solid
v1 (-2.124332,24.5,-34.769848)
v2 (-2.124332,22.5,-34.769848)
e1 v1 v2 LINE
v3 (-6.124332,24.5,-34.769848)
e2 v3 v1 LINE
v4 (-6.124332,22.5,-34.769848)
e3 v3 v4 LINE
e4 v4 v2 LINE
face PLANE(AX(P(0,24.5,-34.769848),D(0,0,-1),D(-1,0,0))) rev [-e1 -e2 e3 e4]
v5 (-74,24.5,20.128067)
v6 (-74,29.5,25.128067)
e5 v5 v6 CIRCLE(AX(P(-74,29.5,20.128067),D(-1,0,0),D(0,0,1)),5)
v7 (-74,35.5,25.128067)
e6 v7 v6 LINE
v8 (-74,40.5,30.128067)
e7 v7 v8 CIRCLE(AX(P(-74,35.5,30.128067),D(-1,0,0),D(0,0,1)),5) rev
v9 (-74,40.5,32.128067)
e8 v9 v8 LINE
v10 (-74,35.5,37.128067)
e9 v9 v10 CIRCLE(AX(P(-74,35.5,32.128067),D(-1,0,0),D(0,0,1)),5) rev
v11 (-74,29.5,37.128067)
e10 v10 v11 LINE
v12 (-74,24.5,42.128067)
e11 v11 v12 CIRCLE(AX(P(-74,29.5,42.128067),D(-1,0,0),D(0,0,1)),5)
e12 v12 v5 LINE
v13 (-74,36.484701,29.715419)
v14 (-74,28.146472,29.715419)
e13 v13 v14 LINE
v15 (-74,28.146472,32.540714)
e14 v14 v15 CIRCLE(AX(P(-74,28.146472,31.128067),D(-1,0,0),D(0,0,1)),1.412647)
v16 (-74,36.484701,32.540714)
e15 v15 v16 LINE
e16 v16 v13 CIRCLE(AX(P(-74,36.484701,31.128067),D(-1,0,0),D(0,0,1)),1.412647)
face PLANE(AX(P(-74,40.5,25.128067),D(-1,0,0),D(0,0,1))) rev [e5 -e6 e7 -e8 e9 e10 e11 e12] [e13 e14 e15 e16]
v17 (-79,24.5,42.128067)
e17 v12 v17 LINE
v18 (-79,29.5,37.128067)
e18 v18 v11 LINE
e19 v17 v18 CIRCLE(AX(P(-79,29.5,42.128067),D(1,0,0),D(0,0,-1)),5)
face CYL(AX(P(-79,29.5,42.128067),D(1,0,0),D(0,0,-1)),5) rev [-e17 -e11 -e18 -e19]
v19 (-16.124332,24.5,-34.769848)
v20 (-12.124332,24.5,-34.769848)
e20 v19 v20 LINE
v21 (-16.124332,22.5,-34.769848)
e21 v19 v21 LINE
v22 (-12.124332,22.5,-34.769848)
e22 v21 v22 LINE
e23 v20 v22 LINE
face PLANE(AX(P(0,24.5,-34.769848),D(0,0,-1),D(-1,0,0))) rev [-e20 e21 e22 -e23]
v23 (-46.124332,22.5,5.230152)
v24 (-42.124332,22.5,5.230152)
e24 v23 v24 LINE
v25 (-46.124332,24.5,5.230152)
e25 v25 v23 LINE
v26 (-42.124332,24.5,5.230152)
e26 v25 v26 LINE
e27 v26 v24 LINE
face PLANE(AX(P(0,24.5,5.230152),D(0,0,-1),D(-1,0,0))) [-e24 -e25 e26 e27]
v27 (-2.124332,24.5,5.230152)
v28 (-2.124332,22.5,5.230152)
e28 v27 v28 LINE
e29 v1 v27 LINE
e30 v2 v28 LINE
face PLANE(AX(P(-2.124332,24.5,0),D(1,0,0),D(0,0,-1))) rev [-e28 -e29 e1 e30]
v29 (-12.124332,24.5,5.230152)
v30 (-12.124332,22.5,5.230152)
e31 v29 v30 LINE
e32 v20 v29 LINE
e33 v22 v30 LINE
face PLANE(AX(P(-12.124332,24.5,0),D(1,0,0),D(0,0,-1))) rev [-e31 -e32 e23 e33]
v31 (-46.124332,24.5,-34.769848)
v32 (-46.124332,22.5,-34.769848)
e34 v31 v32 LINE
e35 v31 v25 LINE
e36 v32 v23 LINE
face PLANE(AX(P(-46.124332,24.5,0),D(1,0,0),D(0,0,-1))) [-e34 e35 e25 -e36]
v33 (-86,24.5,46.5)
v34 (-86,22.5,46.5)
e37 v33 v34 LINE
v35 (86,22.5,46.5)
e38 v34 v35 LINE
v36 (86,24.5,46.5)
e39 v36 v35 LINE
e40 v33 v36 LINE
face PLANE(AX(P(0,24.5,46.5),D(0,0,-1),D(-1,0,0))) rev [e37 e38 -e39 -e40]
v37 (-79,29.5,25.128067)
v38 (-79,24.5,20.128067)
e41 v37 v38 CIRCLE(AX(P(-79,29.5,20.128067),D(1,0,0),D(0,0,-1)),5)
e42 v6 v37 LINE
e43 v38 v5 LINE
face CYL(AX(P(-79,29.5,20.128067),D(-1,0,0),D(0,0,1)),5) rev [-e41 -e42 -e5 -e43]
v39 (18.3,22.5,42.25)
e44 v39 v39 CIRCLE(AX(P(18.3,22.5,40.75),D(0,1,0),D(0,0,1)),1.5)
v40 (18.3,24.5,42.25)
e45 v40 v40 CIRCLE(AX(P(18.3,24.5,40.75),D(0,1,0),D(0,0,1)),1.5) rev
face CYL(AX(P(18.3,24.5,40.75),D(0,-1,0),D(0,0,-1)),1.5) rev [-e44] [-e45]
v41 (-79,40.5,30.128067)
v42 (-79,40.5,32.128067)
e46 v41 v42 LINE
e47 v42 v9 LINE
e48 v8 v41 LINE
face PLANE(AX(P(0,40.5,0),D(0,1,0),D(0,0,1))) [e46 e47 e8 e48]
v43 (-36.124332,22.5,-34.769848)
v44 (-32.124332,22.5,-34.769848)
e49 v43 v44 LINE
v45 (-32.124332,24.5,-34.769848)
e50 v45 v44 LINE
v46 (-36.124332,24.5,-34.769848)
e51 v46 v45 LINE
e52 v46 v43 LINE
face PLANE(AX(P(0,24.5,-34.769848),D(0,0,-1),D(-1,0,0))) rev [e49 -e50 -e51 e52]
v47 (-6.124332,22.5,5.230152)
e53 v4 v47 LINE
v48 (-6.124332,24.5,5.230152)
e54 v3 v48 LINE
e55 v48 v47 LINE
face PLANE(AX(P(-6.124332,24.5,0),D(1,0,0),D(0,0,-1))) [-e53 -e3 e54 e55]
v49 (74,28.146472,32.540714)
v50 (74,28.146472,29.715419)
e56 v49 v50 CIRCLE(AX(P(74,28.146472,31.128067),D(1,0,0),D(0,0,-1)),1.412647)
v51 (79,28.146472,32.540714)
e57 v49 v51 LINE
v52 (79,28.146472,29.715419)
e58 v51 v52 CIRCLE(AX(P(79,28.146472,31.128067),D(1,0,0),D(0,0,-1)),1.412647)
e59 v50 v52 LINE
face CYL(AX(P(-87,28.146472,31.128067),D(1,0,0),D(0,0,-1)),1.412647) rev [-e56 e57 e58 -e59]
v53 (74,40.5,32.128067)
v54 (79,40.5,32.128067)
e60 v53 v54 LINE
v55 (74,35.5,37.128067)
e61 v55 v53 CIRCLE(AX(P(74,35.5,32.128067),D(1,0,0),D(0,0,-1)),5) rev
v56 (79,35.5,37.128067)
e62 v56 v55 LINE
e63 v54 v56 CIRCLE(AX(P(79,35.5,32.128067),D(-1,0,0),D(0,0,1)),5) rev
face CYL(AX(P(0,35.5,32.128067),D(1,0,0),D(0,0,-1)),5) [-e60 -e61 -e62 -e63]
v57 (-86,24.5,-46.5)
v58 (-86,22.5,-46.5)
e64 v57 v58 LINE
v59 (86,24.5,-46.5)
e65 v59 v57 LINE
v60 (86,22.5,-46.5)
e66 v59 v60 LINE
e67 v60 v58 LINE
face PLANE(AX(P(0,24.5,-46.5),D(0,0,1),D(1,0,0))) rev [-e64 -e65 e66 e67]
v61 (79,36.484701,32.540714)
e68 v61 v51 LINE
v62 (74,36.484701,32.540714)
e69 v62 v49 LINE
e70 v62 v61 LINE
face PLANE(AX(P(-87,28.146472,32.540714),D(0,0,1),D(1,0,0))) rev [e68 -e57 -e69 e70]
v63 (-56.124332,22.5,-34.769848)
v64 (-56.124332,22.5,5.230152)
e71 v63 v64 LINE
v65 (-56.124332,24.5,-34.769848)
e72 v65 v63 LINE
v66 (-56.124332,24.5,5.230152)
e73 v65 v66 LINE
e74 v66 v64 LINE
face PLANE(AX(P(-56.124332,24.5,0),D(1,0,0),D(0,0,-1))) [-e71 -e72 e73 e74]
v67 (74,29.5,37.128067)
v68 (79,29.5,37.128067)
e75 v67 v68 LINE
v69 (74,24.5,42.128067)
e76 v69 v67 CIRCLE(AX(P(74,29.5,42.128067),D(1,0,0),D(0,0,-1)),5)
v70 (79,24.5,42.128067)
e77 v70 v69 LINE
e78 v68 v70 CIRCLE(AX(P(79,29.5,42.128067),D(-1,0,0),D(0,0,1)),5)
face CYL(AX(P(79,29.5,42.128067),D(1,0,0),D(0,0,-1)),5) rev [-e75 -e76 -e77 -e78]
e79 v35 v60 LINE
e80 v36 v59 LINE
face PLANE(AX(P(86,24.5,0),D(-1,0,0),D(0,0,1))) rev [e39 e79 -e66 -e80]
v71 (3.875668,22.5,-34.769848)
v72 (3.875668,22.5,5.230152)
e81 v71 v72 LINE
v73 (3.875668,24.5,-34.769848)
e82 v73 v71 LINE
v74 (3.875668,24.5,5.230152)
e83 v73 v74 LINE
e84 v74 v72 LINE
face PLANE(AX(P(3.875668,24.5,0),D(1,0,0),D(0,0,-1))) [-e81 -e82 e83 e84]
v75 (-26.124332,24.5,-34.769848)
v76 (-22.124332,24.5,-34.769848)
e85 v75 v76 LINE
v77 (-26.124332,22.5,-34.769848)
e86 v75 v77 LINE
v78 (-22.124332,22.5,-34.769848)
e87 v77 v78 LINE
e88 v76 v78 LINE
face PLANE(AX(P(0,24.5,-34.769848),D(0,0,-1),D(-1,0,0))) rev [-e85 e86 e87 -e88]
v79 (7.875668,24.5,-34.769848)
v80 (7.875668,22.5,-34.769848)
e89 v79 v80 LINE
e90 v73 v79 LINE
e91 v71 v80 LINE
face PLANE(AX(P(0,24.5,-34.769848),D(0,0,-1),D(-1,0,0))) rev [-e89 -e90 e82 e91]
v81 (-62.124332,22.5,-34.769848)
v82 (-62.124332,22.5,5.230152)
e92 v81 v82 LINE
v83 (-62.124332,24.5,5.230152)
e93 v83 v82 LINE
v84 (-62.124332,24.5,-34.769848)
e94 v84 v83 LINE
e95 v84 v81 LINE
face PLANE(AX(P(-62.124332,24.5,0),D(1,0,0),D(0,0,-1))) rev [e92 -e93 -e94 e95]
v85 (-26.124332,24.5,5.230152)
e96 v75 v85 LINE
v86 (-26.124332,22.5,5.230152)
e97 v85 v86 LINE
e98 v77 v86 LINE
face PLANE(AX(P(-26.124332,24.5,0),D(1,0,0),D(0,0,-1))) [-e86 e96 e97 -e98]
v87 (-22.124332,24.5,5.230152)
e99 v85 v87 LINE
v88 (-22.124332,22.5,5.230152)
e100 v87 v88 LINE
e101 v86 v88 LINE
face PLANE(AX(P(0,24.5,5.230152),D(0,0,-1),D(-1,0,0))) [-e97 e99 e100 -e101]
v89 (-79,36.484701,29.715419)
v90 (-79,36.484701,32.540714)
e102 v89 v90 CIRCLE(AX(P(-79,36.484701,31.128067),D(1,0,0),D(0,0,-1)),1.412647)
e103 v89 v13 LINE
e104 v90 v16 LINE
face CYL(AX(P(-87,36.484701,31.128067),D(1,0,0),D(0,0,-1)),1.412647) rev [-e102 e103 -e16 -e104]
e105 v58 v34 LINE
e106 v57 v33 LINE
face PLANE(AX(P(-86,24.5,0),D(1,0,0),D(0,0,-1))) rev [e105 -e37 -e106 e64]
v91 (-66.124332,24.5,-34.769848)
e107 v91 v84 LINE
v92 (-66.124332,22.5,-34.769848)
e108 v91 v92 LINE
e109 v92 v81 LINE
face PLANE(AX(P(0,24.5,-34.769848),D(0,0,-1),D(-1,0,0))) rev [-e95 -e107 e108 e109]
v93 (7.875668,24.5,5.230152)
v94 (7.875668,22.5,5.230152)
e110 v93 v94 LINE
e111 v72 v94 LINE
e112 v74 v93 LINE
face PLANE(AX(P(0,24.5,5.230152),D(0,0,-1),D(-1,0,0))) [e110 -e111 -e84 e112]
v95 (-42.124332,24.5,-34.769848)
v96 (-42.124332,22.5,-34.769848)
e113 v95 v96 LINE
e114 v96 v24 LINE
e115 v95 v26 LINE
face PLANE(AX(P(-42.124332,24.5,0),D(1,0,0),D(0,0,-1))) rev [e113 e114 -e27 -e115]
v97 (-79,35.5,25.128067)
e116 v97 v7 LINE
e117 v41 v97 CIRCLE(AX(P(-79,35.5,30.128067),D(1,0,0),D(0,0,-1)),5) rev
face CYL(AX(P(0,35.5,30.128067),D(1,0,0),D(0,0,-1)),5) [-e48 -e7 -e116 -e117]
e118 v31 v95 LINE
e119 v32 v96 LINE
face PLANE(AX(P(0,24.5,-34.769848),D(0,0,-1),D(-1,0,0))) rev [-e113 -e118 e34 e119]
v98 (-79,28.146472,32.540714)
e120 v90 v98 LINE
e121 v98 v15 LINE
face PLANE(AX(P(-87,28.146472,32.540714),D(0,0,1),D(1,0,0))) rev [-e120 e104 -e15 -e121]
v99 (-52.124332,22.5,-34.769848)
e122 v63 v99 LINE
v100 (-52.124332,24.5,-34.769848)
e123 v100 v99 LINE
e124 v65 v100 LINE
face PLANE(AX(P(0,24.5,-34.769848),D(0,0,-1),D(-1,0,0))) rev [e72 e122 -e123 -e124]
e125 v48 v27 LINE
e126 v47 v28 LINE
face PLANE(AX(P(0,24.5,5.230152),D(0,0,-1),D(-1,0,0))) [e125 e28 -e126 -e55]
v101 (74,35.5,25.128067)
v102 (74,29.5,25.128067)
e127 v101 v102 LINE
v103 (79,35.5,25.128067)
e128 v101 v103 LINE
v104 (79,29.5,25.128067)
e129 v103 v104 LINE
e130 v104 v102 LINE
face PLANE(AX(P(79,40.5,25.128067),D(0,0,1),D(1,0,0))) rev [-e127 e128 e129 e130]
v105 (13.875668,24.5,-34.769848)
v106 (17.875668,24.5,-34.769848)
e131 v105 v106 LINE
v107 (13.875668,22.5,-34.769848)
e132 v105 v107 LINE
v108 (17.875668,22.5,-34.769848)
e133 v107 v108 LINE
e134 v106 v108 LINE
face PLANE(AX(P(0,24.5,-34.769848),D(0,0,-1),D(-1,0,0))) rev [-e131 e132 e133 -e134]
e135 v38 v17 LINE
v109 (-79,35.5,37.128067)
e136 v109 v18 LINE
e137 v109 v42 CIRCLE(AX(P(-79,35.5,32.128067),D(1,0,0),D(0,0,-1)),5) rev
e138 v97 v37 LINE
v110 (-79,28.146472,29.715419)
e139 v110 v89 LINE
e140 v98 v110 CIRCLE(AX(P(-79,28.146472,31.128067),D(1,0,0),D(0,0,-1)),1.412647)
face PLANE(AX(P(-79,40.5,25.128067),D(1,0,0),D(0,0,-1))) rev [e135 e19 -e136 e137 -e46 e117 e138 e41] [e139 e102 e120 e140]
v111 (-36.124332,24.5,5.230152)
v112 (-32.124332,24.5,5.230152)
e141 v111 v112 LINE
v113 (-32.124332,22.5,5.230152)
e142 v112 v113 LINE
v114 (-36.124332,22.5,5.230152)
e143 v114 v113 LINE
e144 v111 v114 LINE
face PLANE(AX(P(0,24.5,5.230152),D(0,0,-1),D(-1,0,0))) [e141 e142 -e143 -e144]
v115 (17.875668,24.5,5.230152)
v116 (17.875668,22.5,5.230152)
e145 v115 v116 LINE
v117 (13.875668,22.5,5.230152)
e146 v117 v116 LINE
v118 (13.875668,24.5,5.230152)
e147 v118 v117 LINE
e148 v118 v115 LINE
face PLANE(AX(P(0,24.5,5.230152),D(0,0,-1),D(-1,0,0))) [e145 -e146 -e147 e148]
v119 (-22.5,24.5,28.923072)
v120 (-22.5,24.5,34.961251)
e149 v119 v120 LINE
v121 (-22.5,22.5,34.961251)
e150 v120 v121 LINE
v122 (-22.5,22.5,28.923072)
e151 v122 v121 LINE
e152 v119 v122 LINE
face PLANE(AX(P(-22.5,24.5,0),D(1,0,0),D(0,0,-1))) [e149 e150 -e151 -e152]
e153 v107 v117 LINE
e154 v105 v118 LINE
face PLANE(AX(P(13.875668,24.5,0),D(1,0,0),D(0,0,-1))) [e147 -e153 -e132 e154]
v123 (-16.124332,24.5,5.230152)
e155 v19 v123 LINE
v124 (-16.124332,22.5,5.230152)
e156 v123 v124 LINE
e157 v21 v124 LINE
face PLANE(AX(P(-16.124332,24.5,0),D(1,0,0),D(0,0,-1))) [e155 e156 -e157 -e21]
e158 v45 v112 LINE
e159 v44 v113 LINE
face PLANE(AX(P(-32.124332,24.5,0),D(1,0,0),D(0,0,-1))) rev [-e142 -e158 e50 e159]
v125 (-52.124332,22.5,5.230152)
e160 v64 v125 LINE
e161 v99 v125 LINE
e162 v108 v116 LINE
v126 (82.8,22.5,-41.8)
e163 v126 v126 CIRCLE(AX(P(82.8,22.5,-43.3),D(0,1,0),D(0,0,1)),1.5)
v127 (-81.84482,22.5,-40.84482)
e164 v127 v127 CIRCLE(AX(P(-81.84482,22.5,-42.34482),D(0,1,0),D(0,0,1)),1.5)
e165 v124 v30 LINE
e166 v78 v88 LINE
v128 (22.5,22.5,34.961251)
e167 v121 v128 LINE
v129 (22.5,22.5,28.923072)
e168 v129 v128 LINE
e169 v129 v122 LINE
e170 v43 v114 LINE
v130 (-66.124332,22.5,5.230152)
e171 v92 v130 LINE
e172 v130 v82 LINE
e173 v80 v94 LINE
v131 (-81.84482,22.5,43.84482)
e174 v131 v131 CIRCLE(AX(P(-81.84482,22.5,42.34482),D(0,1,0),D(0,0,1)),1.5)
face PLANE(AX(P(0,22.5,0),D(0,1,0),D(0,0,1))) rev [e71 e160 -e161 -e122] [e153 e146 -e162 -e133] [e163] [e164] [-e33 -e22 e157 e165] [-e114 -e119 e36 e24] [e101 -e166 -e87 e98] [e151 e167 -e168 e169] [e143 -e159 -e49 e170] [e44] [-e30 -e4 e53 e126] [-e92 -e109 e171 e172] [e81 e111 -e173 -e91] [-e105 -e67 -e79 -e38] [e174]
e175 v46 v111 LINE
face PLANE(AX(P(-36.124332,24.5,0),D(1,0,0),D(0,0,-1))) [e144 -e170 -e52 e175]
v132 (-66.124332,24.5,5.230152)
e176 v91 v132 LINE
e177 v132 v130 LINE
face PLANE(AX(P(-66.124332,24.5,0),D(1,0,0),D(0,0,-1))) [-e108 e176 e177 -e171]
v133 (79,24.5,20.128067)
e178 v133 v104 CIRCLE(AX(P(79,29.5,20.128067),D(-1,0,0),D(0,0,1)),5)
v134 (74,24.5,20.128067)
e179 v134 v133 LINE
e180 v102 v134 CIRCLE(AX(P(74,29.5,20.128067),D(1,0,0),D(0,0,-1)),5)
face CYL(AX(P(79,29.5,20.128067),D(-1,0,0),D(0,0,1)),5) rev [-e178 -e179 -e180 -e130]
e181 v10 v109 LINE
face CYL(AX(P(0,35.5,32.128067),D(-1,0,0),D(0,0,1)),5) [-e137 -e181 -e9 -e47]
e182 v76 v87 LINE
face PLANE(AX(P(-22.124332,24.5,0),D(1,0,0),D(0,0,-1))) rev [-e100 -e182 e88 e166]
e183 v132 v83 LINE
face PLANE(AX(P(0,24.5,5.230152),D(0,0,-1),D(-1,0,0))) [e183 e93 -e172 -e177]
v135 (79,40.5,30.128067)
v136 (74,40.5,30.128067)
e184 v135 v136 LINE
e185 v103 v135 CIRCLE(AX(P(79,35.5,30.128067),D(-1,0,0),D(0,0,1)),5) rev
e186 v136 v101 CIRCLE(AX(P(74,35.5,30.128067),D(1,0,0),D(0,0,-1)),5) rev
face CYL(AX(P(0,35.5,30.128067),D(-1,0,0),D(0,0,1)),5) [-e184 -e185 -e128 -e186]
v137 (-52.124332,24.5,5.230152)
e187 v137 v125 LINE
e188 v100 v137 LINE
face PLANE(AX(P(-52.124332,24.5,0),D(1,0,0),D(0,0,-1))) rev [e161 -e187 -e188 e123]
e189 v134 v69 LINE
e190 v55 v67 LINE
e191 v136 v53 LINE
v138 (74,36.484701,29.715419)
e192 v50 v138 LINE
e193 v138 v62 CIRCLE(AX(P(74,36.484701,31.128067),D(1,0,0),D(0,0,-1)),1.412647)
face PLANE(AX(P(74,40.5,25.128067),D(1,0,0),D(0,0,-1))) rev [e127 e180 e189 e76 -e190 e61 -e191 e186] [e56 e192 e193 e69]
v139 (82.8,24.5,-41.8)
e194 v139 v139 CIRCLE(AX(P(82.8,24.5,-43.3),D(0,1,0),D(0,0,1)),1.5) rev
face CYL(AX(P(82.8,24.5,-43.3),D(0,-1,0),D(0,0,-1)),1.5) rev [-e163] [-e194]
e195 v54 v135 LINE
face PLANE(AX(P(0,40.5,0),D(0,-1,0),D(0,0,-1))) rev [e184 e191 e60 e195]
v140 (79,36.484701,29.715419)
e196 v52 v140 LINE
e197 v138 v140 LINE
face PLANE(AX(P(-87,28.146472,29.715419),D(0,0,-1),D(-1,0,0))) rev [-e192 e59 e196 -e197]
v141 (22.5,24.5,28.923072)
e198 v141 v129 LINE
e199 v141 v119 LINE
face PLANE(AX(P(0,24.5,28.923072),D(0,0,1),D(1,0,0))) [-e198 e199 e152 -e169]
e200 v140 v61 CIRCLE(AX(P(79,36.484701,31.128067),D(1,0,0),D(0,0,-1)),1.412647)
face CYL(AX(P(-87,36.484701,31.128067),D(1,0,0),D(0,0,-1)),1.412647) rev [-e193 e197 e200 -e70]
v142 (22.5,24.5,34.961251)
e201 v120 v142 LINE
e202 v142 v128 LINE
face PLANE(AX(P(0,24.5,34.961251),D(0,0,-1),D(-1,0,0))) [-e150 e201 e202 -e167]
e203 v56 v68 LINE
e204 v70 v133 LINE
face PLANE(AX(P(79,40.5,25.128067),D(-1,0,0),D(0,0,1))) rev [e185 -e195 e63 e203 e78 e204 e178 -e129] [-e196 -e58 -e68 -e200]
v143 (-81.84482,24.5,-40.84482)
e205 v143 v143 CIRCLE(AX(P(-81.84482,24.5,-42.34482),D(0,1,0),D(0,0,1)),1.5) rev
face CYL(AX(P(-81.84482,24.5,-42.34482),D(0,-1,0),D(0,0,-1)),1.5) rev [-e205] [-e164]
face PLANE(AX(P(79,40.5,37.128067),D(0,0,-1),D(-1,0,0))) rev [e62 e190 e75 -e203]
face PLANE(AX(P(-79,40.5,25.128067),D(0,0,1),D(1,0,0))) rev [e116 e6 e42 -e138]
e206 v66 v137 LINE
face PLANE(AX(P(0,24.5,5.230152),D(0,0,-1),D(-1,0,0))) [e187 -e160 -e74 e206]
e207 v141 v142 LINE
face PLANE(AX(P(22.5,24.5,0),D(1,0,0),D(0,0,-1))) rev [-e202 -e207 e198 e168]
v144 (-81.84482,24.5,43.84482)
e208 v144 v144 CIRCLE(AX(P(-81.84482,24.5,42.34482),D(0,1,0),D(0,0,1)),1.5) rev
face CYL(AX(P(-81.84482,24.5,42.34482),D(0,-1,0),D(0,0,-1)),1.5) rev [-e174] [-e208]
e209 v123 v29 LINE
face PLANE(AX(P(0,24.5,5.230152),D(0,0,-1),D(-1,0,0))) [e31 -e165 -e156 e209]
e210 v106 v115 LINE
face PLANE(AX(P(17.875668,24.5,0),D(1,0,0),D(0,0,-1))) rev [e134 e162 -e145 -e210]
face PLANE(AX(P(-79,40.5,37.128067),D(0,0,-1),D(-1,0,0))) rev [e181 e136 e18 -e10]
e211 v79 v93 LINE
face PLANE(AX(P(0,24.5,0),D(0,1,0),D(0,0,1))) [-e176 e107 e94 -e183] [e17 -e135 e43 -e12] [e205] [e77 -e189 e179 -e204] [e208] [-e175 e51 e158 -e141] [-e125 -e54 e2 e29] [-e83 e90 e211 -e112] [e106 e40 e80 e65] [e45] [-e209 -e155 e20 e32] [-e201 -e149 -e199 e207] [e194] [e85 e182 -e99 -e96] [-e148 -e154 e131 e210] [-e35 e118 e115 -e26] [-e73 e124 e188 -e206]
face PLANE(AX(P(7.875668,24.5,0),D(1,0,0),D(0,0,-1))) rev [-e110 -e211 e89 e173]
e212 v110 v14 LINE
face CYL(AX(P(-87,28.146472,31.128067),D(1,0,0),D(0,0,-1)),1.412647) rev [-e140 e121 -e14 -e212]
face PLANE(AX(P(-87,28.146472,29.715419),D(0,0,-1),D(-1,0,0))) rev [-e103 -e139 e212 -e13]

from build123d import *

# Parameters (mm, degrees)
SKETCH1_W            = 172
SKETCH1_H            = 93
BOSS_EXTRUDE1_DEPTH  = 1
SKETCH2_W            = 172
SKETCH2_H            = 93
SKETCH2_W_2          = 169
SKETCH2_H_2          = 90
BOSS_EXTRUDE2_DEPTH  = 21.5
SKETCH3_W            = 14.5
SKETCH3_H            = 20
SKETCH3_W_2          = 16.2
SKETCH3_W_3          = 76
SKETCH3_H_2          = 7
CUT_EXTRUDE1_DEPTH   = 21.5
BOSS_EXTRUDE3_DEPTH  = 10
FILLET1_R            = 4
SKETCH5_R            = 1.5
BOSS_EXTRUDE4_DEPTH  = 2.5
BOSS_EXTRUDE5_DEPTH  = 10
SKETCH7_W            = 1.5
SKETCH7_H            = 3.5
BOSS_EXTRUDE6_DEPTH  = 10
FILLET2_R            = 4
SKETCH8_R            = 4
SKETCH8_R_2          = 1.5
BOSS_EXTRUDE7_DEPTH  = 14
SKETCH10_W           = 16
SKETCH10_H           = 4
CUT_EXTRUDE2_DEPTH   = 14
CUT_EXTRUDE3_DEPTH   = 1.6
FILLET3_R            = 4
SKETCH12_W           = 10
SKETCH12_H           = 6
SKETCH12_W_2         = 8
SKETCH12_H_2         = 8
CUT_EXTRUDE4_DEPTH   = 25.1
SKETCH13_W           = 6.4
SKETCH13_H           = 6.4
SKETCH13_W_2         = 6
SKETCH13_H_2         = 6
BOSS_EXTRUDE8_DEPTH  = 21.5
FILLET4_R            = 3
SKETCH14_R           = 1.5
CUT_EXTRUDE5_DEPTH   = 20
SKETCH15_W           = 172
SKETCH15_H           = 93
SKETCH15_R           = 1.5
SKETCH15_W_2         = 4
SKETCH15_H_2         = 40
SKETCH15_W_3         = 45
SKETCH15_H_3         = 6.0381788
BOSS_EXTRUDE9_DEPTH  = 2
SKETCH16_W           = 56
SKETCH16_H           = 7.274551358
CUT_EXTRUDE6_DEPTH   = 2
SKETCH17_W           = 5
SKETCH17_H           = 12
BOSS_EXTRUDE10_DEPTH = 16
FILLET6_R            = 5
CUT_EXTRUDE7_DEPTH   = 166


# Read off the part's stored shape, not the designer's step: Intersect2
# Some blends are built 0.0001 mm under size
with BuildPart() as part:
    # Sketch1 → Boss-Extrude1 (new body)
    with BuildSketch(Plane(origin=(0, 0, 0), x_dir=(1, 0, 0), z_dir=(0, 1, 0))):
        Rectangle(SKETCH1_W, SKETCH1_H)
    extrude(amount=BOSS_EXTRUDE1_DEPTH)

    # Sketch2 → Boss-Extrude2 (add)
    with BuildSketch(Plane(origin=(0, 1, 0), x_dir=(1, 0, 0), z_dir=(0, 1, 0))):
        Rectangle(SKETCH2_W, SKETCH2_H)
        Rectangle(SKETCH2_W_2, SKETCH2_H_2, mode=Mode.SUBTRACT)
    extrude(amount=BOSS_EXTRUDE2_DEPTH)

    # Sketch3 → Cut-Extrude1 (cut)
    with BuildSketch(Plane.XY.offset(46.5)):
        with Locations((74.75, 11)):
            Rectangle(SKETCH3_W, SKETCH3_H)
        with Locations((57.75, 11)):
            Rectangle(SKETCH3_W, SKETCH3_H)
        with Locations((39, 11)):
            Rectangle(SKETCH3_W_2, SKETCH3_H)
        with Locations((-30.2, 6.2)):
            Rectangle(SKETCH3_W_3, SKETCH3_H_2)
    extrude(amount=-CUT_EXTRUDE1_DEPTH, mode=Mode.SUBTRACT)

    # Sketch4 → Boss-Extrude3 (add)
    with BuildSketch(Plane(origin=(0, 1, 0), x_dir=(1, 0, 0), z_dir=(0, 1, 0))):
        Polygon((26.9, -45), (28.4, -45), (28.4, 40.1), (84.5, 40.1), (84.5, 41.6), (26.9, 41.6), align=None)
    extrude(amount=BOSS_EXTRUDE3_DEPTH)

    # Fillet1
    fillet1_edges = [part.edges().sort_by_distance(p)[0] for p in [
        (26.9, 6, 45),
    ]]
    fillet(fillet1_edges, radius=FILLET1_R)

    # Sketch5 → Boss-Extrude4 (add)
    # profile 1 of 4: a face of its own
    with BuildSketch(Plane(origin=(0, 1, 0), x_dir=(1, 0, 0), z_dir=(0, 1, 0))):
        with BuildLine():
            Line((28.4, 40.1), (35.4, 40.1))
            Line((35.4, 40.1), (35.4, 35.1))
            ThreePointArc((35.4, 35.1), (34.814213562, 33.685786438), (33.4, 33.1))
            Line((33.4, 33.1), (28.4, 33.1))
            Line((28.4, 33.1), (28.4, 40.1))
        make_face()
        with Locations(Location((32.6, 36.1, 0), (0, 0, 270))):
            Circle(SKETCH5_R, mode=Mode.SUBTRACT)
    # profile 2 of 4: a face of its own
    with BuildSketch(Plane(origin=(0, 1, 0), x_dir=(1, 0, 0), z_dir=(0, 1, 0))):
        with BuildLine():
            Line((84.5, 40.1), (77.5, 40.1))
            Line((77.5, 40.1), (77.5, 35.1))
            ThreePointArc((77.5, 35.1), (78.085786438, 33.685786438), (79.5, 33.1))
            Line((79.5, 33.1), (84.5, 33.1))
            Line((84.5, 33.1), (84.5, 40.1))
        make_face()
        with Locations(Location((80.3, 36.1, 0), (0, 0, 270))):
            Circle(SKETCH5_R, mode=Mode.SUBTRACT)
    # profile 3 of 4: a face of its own
    with BuildSketch(Plane(origin=(0, 1, 0), x_dir=(1, 0, 0), z_dir=(0, 1, 0))):
        with BuildLine():
            Line((28.4, -18.4), (33.533804299, -18.4))
            ThreePointArc((33.533804299, -18.4), (34.948017861, -18.985786438), (35.533804299, -20.4))
            Line((35.533804299, -20.4), (35.533804299, -23.4))
            ThreePointArc((35.533804299, -23.4), (34.948017861, -24.814213562), (33.533804299, -25.4))
            Line((33.533804299, -25.4), (28.4, -25.4))
            Line((28.4, -25.4), (28.4, -18.4))
        make_face()
        with Locations(Location((32.6, -21.9, 0), (0, 0, 270))):
            Circle(SKETCH5_R, mode=Mode.SUBTRACT)
    # profile 4 of 4: a face of its own
    with BuildSketch(Plane(origin=(0, 1, 0), x_dir=(1, 0, 0), z_dir=(0, 1, 0))):
        with BuildLine():
            Line((84.5, -18.4), (79.00543069, -18.4))
            ThreePointArc((79.00543069, -18.4), (77.591217128, -18.985786438), (77.00543069, -20.4))
            Line((77.00543069, -20.4), (77.00543069, -23.4))
            ThreePointArc((77.00543069, -23.4), (77.591217128, -24.814213562), (79.00543069, -25.4))
            Line((79.00543069, -25.4), (84.5, -25.4))
            Line((84.5, -25.4), (84.5, -18.4))
        make_face()
        with Locations(Location((80.3, -21.9, 0), (0, 0, 270))):
            Circle(SKETCH5_R, mode=Mode.SUBTRACT)
    extrude(amount=BOSS_EXTRUDE4_DEPTH)

    # Sketch6 → Boss-Extrude5 (add)
    with BuildSketch(Plane(origin=(0, 1, 0), x_dir=(1, 0, 0), z_dir=(0, 1, 0))):
        Polygon((-65.7, -40), (-68.2, -40), (-68.2, -37.9), (-65.7, -37.9), (-65.7, -36.402716815), (-69.7, -36.402716815), (-69.7, -41.5), (-65.7, -41.5), align=None)
        Polygon((5.3, -36.402716815), (5.3, -37.9), (7.8, -37.9), (7.8, -40), (5.3, -40), (5.3, -41.5), (9.3, -41.5), (9.3, -36.402716815), align=None)
    extrude(amount=BOSS_EXTRUDE5_DEPTH)

    # Sketch7 → Boss-Extrude6 (add)
    with BuildSketch(Plane(origin=(0, 1, 0), x_dir=(1, 0, 0), z_dir=(0, 1, 0))):
        with Locations((-68.95, -43.25)):
            Rectangle(SKETCH7_W, SKETCH7_H)
        with Locations((8.55, -43.25)):
            Rectangle(SKETCH7_W, SKETCH7_H)
    extrude(amount=BOSS_EXTRUDE6_DEPTH)

    # Fillet2
    fillet2_edges = [part.edges().sort_by_distance(p)[0] for p in [
        (-69.7, 6, 45),
        (9.3, 6, 45),
    ]]
    fillet(fillet2_edges, radius=FILLET2_R)

    # Sketch8 → Boss-Extrude7 (add)
    # profile 1 of 3: a face of its own
    with BuildSketch(Plane(origin=(0, 1, 0), x_dir=(1, 0, 0), z_dir=(0, 1, 0))):
        with Locations(Location((-38.2, -6, 0), (0, 0, 90))):
            Circle(SKETCH8_R)
        with Locations(Location((-38.2, -6, 0), (0, 0, 270))):
            Circle(SKETCH8_R_2, mode=Mode.SUBTRACT)
    # profile 2 of 3: a face of its own
    with BuildSketch(Plane(origin=(0, 1, 0), x_dir=(1, 0, 0), z_dir=(0, 1, 0))):
        with Locations(Location((-36.5, 40, 0), (0, 0, 90))):
            Circle(SKETCH8_R)
        with Locations(Location((-36.5, 40, 0), (0, 0, 270))):
            Circle(SKETCH8_R_2, mode=Mode.SUBTRACT)
    # profile 3 of 3: a face of its own
    with BuildSketch(Plane(origin=(0, 1, 0), x_dir=(1, 0, 0), z_dir=(0, 1, 0))):
        with Locations(Location((13.5, 17, 0), (0, 0, 90))):
            Circle(SKETCH8_R)
    extrude(amount=BOSS_EXTRUDE7_DEPTH)

    # Sketch10 → Cut-Extrude2 (cut)
    with BuildSketch(Plane(origin=(0, 0, -46.5), x_dir=(-1, 0, 0), z_dir=(0, 0, -1))):
        with Locations((-55.7, 3)):
            Rectangle(SKETCH10_W, SKETCH10_H)
    extrude(amount=-CUT_EXTRUDE2_DEPTH, mode=Mode.SUBTRACT)

    # Sketch11 → Cut-Extrude3 (cut)
    with BuildSketch(Plane(origin=(0, 0, -46.5), x_dir=(-1, 0, 0), z_dir=(0, 0, -1))):
        with BuildLine():
            Line((-65.7, 12), (-45.7, 12))
            ThreePointArc((-45.7, 12), (-44.285786438, 11.414213562), (-43.7, 10))
            Line((-43.7, 10), (-43.7, 3))
            ThreePointArc((-43.7, 3), (-44.285786438, 1.585786438), (-45.7, 1))
            Line((-45.7, 1), (-65.7, 1))
            ThreePointArc((-65.7, 1), (-67.114213562, 1.585786438), (-67.7, 3))
            Line((-67.7, 3), (-67.7, 10))
            ThreePointArc((-67.7, 10), (-67.114213562, 11.414213562), (-65.7, 12))
        make_face()
    extrude(amount=-CUT_EXTRUDE3_DEPTH, mode=Mode.SUBTRACT)

    # Fillet3
    # the kernel refuses this fillet: 4 mm, written as the material it adds along each edge
    with BuildSketch(Plane(origin=(-36.5, 1, -40), x_dir=(0, 0, -1), z_dir=(1, 0, 0))) as fillet3_piece_1_section:
        with BuildLine():
            CenterArc((4 + FILLET3_R, FILLET3_R), FILLET3_R, 180, 90)
            Line((4, FILLET3_R), (4, 0))
            Line((4, 0), (4 + FILLET3_R, 0))
        make_face()
    fillet3_piece_1 = revolve(axis=Axis((-36.5, 1, -40), (0, 1, 0)), mode=Mode.PRIVATE)
    fillet3_piece_1 = split(fillet3_piece_1, bisect_by=Plane(origin=(-36.5, 1, -45), z_dir=(0, 0, 1)), keep=Keep.TOP, mode=Mode.PRIVATE)
    add(fillet3_piece_1)
    with BuildSketch(Plane(origin=(-38.2, 1, 6), x_dir=(0, 0, -1), z_dir=(1, 0, 0))) as fillet3_piece_2:
        with BuildLine():
            CenterArc((4 + FILLET3_R, FILLET3_R), FILLET3_R, 180, 90)
            Line((4, FILLET3_R), (4, 0))
            Line((4, 0), (4 + FILLET3_R, 0))
        make_face()
    revolve(axis=Axis((-38.2, 1, 6), (0, 1, 0)))
    with BuildSketch(Plane(origin=(13.5, 1, -17), x_dir=(0, 0, -1), z_dir=(1, 0, 0))) as fillet3_piece_3:
        with BuildLine():
            CenterArc((4 + FILLET3_R, FILLET3_R), FILLET3_R, 180, 90)
            Line((4, FILLET3_R), (4, 0))
            Line((4, 0), (4 + FILLET3_R, 0))
        make_face()
    revolve(axis=Axis((13.5, 1, -17), (0, 1, 0)))

    # Sketch12 → Cut-Extrude4 (cut)
    with BuildSketch(Plane(origin=(0, 0, -46.5), x_dir=(-1, 0, 0), z_dir=(0, 0, -1))):
        with Locations((27.5, 12)):
            Rectangle(SKETCH12_W, SKETCH12_H)
        Polygon((-13.5, 15), (-13.5, 16), (6.5, 16), (6.5, 15), (6.5, 6), (-13.5, 6), align=None)
        with Locations((-29, 11)):
            Rectangle(SKETCH12_W_2, SKETCH12_H_2)
    extrude(amount=-CUT_EXTRUDE4_DEPTH, mode=Mode.SUBTRACT)

    # Sketch13 → Boss-Extrude8 (add)
    with BuildSketch(Plane(origin=(0, 1, 0), x_dir=(1, 0, 0), z_dir=(0, 1, 0))):
        with Locations((82.8, 43.3)):
            Rectangle(SKETCH13_W, SKETCH13_H)
        with Locations((-81.5, 42)):
            Rectangle(SKETCH13_W_2, SKETCH13_H_2)
        with Locations((-81.5, -42)):
            Rectangle(SKETCH13_W_2, SKETCH13_H_2)
        with BuildLine():
            Line((13.3, -45), (23.3, -45))
            Line((23.3, -45), (23.3, -39))
            ThreePointArc((23.3, -39), (22.128427125, -36.171572875), (19.3, -35))
            Line((19.3, -35), (17.3, -35))
            ThreePointArc((17.3, -35), (14.471572875, -36.171572875), (13.3, -39))
            Line((13.3, -39), (13.3, -45))
        make_face()
    extrude(amount=BOSS_EXTRUDE8_DEPTH)

    # Fillet4
    fillet4_edges = [part.edges().sort_by_distance(p)[0] for p in [
        (-78.5, 11.75, 39),
        (-78.5, 11.75, 45),
        (-84.5, 11.75, 39),
        (-78.5, 11.75, -39),
        (-78.5, 11.75, -45),
        (-84.5, 11.75, -39),
    ]]
    fillet(fillet4_edges, radius=FILLET4_R - 0.0001)  # a hair under: the kernel refuses the full size

    # Sketch14 → Cut-Extrude5 (cut)
    with BuildSketch(Plane(origin=(0, 22.5, 0), x_dir=(1, 0, 0), z_dir=(0, 1, 0))):
        with Locations(Location((-81.844819979, 42.344819979, 0), (0, 0, 270))):
            Circle(SKETCH14_R)
        with Locations(Location((-81.844819979, -42.344819979, 0), (0, 0, 270))):
            Circle(SKETCH14_R)
        with Locations(Location((18.3, -40.75, 0), (0, 0, 270))):
            Circle(SKETCH14_R)
        with Locations(Location((82.8, 43.3, 0), (0, 0, 270))):
            Circle(SKETCH14_R)
    extrude(amount=-CUT_EXTRUDE5_DEPTH, mode=Mode.SUBTRACT)

    # Sketch16 → Cut-Extrude6 (cut)
    with BuildSketch(Plane(origin=(86, 0, 0), x_dir=(0, 0, -1), z_dir=(1, 0, 0))):
        with Locations((8, 18.862724321)):
            Rectangle(SKETCH16_W, SKETCH16_H)
    extrude(amount=-CUT_EXTRUDE6_DEPTH, mode=Mode.SUBTRACT)


with BuildPart() as body_2:
    # Sketch15 → Boss-Extrude9 (new body)
    with BuildSketch(Plane(origin=(0, 22.5, 0), x_dir=(1, 0, 0), z_dir=(0, 1, 0))):
        Rectangle(SKETCH15_W, SKETCH15_H)
        with Locations(Location((82.8, 43.3, 0), (0, 0, 270))):
            Circle(SKETCH15_R, mode=Mode.SUBTRACT)
        with Locations(Location((18.3, -40.75, 0), (0, 0, 270))):
            Circle(SKETCH15_R, mode=Mode.SUBTRACT)
        with Locations(Location((-81.844819979, -42.344819979, 0), (0, 0, 270))):
            Circle(SKETCH15_R, mode=Mode.SUBTRACT)
        with Locations(Location((-81.844819979, 42.344819979, 0), (0, 0, 270))):
            Circle(SKETCH15_R, mode=Mode.SUBTRACT)
        with Locations((-54.124331846, 14.769848195)):
            Rectangle(SKETCH15_W_2, SKETCH15_H_2, mode=Mode.SUBTRACT)
        with Locations((-64.124331846, 14.769848195)):
            Rectangle(SKETCH15_W_2, SKETCH15_H_2, mode=Mode.SUBTRACT)
        with Locations((-44.124331846, 14.769848195)):
            Rectangle(SKETCH15_W_2, SKETCH15_H_2, mode=Mode.SUBTRACT)
        with Locations((-34.124331846, 14.769848195)):
            Rectangle(SKETCH15_W_2, SKETCH15_H_2, mode=Mode.SUBTRACT)
        with Locations((-24.124331846, 14.769848195)):
            Rectangle(SKETCH15_W_2, SKETCH15_H_2, mode=Mode.SUBTRACT)
        with Locations((-14.124331846, 14.769848195)):
            Rectangle(SKETCH15_W_2, SKETCH15_H_2, mode=Mode.SUBTRACT)
        with Locations((-4.124331846, 14.769848195)):
            Rectangle(SKETCH15_W_2, SKETCH15_H_2, mode=Mode.SUBTRACT)
        with Locations((5.875668154, 14.769848195)):
            Rectangle(SKETCH15_W_2, SKETCH15_H_2, mode=Mode.SUBTRACT)
        with Locations((15.875668154, 14.769848195)):
            Rectangle(SKETCH15_W_2, SKETCH15_H_2, mode=Mode.SUBTRACT)
        with Locations((0, -31.942161626)):
            Rectangle(SKETCH15_W_3, SKETCH15_H_3, mode=Mode.SUBTRACT)
    extrude(amount=BOSS_EXTRUDE9_DEPTH)

    # Sketch17 → Boss-Extrude10 (add)
    with BuildSketch(Plane(origin=(0, 24.5, 0), x_dir=(1, 0, 0), z_dir=(0, 1, 0))):
        with Locations((-76.5, -31.128066602)):
            Rectangle(SKETCH17_W, SKETCH17_H)
        with Locations((76.5, -31.128066602)):
            Rectangle(SKETCH17_W, SKETCH17_H)
    extrude(amount=BOSS_EXTRUDE10_DEPTH)

    # Fillet6
    fillet6_edges = [body_2.edges().sort_by_distance(p)[0] for p in [
        (-76.5, 24.5, 37.128066602),
        (-76.5, 24.5, 25.128066602),
        (-76.5, 40.5, 37.128066602),
        (-76.5, 40.5, 25.128066602),
        (76.5, 24.5, 25.128066602),
        (76.5, 24.5, 37.128066602),
        (76.5, 40.5, 25.128066602),
        (76.5, 40.5, 37.128066602),
    ]]
    fillet(fillet6_edges, radius=FILLET6_R)

    # Sketch18 → Cut-Extrude7 (cut)
    with BuildSketch(Plane(origin=(79, 0, 0), x_dir=(0, 0, -1), z_dir=(1, 0, 0))):
        with BuildLine():
            Line((-32.54071408, 28.146472212), (-32.54071408, 36.484701473))
            ThreePointArc((-32.54071408, 36.484701473), (-31.128066602, 37.89734895), (-29.715419125, 36.484701473))
            Line((-29.715419125, 36.484701473), (-29.715419125, 28.146472212))
            ThreePointArc((-29.715419125, 28.146472212), (-31.128066602, 26.733824735), (-32.54071408, 28.146472212))
        make_face()
    extrude(amount=-CUT_EXTRUDE7_DEPTH, mode=Mode.SUBTRACT)


solid = body_2.part
